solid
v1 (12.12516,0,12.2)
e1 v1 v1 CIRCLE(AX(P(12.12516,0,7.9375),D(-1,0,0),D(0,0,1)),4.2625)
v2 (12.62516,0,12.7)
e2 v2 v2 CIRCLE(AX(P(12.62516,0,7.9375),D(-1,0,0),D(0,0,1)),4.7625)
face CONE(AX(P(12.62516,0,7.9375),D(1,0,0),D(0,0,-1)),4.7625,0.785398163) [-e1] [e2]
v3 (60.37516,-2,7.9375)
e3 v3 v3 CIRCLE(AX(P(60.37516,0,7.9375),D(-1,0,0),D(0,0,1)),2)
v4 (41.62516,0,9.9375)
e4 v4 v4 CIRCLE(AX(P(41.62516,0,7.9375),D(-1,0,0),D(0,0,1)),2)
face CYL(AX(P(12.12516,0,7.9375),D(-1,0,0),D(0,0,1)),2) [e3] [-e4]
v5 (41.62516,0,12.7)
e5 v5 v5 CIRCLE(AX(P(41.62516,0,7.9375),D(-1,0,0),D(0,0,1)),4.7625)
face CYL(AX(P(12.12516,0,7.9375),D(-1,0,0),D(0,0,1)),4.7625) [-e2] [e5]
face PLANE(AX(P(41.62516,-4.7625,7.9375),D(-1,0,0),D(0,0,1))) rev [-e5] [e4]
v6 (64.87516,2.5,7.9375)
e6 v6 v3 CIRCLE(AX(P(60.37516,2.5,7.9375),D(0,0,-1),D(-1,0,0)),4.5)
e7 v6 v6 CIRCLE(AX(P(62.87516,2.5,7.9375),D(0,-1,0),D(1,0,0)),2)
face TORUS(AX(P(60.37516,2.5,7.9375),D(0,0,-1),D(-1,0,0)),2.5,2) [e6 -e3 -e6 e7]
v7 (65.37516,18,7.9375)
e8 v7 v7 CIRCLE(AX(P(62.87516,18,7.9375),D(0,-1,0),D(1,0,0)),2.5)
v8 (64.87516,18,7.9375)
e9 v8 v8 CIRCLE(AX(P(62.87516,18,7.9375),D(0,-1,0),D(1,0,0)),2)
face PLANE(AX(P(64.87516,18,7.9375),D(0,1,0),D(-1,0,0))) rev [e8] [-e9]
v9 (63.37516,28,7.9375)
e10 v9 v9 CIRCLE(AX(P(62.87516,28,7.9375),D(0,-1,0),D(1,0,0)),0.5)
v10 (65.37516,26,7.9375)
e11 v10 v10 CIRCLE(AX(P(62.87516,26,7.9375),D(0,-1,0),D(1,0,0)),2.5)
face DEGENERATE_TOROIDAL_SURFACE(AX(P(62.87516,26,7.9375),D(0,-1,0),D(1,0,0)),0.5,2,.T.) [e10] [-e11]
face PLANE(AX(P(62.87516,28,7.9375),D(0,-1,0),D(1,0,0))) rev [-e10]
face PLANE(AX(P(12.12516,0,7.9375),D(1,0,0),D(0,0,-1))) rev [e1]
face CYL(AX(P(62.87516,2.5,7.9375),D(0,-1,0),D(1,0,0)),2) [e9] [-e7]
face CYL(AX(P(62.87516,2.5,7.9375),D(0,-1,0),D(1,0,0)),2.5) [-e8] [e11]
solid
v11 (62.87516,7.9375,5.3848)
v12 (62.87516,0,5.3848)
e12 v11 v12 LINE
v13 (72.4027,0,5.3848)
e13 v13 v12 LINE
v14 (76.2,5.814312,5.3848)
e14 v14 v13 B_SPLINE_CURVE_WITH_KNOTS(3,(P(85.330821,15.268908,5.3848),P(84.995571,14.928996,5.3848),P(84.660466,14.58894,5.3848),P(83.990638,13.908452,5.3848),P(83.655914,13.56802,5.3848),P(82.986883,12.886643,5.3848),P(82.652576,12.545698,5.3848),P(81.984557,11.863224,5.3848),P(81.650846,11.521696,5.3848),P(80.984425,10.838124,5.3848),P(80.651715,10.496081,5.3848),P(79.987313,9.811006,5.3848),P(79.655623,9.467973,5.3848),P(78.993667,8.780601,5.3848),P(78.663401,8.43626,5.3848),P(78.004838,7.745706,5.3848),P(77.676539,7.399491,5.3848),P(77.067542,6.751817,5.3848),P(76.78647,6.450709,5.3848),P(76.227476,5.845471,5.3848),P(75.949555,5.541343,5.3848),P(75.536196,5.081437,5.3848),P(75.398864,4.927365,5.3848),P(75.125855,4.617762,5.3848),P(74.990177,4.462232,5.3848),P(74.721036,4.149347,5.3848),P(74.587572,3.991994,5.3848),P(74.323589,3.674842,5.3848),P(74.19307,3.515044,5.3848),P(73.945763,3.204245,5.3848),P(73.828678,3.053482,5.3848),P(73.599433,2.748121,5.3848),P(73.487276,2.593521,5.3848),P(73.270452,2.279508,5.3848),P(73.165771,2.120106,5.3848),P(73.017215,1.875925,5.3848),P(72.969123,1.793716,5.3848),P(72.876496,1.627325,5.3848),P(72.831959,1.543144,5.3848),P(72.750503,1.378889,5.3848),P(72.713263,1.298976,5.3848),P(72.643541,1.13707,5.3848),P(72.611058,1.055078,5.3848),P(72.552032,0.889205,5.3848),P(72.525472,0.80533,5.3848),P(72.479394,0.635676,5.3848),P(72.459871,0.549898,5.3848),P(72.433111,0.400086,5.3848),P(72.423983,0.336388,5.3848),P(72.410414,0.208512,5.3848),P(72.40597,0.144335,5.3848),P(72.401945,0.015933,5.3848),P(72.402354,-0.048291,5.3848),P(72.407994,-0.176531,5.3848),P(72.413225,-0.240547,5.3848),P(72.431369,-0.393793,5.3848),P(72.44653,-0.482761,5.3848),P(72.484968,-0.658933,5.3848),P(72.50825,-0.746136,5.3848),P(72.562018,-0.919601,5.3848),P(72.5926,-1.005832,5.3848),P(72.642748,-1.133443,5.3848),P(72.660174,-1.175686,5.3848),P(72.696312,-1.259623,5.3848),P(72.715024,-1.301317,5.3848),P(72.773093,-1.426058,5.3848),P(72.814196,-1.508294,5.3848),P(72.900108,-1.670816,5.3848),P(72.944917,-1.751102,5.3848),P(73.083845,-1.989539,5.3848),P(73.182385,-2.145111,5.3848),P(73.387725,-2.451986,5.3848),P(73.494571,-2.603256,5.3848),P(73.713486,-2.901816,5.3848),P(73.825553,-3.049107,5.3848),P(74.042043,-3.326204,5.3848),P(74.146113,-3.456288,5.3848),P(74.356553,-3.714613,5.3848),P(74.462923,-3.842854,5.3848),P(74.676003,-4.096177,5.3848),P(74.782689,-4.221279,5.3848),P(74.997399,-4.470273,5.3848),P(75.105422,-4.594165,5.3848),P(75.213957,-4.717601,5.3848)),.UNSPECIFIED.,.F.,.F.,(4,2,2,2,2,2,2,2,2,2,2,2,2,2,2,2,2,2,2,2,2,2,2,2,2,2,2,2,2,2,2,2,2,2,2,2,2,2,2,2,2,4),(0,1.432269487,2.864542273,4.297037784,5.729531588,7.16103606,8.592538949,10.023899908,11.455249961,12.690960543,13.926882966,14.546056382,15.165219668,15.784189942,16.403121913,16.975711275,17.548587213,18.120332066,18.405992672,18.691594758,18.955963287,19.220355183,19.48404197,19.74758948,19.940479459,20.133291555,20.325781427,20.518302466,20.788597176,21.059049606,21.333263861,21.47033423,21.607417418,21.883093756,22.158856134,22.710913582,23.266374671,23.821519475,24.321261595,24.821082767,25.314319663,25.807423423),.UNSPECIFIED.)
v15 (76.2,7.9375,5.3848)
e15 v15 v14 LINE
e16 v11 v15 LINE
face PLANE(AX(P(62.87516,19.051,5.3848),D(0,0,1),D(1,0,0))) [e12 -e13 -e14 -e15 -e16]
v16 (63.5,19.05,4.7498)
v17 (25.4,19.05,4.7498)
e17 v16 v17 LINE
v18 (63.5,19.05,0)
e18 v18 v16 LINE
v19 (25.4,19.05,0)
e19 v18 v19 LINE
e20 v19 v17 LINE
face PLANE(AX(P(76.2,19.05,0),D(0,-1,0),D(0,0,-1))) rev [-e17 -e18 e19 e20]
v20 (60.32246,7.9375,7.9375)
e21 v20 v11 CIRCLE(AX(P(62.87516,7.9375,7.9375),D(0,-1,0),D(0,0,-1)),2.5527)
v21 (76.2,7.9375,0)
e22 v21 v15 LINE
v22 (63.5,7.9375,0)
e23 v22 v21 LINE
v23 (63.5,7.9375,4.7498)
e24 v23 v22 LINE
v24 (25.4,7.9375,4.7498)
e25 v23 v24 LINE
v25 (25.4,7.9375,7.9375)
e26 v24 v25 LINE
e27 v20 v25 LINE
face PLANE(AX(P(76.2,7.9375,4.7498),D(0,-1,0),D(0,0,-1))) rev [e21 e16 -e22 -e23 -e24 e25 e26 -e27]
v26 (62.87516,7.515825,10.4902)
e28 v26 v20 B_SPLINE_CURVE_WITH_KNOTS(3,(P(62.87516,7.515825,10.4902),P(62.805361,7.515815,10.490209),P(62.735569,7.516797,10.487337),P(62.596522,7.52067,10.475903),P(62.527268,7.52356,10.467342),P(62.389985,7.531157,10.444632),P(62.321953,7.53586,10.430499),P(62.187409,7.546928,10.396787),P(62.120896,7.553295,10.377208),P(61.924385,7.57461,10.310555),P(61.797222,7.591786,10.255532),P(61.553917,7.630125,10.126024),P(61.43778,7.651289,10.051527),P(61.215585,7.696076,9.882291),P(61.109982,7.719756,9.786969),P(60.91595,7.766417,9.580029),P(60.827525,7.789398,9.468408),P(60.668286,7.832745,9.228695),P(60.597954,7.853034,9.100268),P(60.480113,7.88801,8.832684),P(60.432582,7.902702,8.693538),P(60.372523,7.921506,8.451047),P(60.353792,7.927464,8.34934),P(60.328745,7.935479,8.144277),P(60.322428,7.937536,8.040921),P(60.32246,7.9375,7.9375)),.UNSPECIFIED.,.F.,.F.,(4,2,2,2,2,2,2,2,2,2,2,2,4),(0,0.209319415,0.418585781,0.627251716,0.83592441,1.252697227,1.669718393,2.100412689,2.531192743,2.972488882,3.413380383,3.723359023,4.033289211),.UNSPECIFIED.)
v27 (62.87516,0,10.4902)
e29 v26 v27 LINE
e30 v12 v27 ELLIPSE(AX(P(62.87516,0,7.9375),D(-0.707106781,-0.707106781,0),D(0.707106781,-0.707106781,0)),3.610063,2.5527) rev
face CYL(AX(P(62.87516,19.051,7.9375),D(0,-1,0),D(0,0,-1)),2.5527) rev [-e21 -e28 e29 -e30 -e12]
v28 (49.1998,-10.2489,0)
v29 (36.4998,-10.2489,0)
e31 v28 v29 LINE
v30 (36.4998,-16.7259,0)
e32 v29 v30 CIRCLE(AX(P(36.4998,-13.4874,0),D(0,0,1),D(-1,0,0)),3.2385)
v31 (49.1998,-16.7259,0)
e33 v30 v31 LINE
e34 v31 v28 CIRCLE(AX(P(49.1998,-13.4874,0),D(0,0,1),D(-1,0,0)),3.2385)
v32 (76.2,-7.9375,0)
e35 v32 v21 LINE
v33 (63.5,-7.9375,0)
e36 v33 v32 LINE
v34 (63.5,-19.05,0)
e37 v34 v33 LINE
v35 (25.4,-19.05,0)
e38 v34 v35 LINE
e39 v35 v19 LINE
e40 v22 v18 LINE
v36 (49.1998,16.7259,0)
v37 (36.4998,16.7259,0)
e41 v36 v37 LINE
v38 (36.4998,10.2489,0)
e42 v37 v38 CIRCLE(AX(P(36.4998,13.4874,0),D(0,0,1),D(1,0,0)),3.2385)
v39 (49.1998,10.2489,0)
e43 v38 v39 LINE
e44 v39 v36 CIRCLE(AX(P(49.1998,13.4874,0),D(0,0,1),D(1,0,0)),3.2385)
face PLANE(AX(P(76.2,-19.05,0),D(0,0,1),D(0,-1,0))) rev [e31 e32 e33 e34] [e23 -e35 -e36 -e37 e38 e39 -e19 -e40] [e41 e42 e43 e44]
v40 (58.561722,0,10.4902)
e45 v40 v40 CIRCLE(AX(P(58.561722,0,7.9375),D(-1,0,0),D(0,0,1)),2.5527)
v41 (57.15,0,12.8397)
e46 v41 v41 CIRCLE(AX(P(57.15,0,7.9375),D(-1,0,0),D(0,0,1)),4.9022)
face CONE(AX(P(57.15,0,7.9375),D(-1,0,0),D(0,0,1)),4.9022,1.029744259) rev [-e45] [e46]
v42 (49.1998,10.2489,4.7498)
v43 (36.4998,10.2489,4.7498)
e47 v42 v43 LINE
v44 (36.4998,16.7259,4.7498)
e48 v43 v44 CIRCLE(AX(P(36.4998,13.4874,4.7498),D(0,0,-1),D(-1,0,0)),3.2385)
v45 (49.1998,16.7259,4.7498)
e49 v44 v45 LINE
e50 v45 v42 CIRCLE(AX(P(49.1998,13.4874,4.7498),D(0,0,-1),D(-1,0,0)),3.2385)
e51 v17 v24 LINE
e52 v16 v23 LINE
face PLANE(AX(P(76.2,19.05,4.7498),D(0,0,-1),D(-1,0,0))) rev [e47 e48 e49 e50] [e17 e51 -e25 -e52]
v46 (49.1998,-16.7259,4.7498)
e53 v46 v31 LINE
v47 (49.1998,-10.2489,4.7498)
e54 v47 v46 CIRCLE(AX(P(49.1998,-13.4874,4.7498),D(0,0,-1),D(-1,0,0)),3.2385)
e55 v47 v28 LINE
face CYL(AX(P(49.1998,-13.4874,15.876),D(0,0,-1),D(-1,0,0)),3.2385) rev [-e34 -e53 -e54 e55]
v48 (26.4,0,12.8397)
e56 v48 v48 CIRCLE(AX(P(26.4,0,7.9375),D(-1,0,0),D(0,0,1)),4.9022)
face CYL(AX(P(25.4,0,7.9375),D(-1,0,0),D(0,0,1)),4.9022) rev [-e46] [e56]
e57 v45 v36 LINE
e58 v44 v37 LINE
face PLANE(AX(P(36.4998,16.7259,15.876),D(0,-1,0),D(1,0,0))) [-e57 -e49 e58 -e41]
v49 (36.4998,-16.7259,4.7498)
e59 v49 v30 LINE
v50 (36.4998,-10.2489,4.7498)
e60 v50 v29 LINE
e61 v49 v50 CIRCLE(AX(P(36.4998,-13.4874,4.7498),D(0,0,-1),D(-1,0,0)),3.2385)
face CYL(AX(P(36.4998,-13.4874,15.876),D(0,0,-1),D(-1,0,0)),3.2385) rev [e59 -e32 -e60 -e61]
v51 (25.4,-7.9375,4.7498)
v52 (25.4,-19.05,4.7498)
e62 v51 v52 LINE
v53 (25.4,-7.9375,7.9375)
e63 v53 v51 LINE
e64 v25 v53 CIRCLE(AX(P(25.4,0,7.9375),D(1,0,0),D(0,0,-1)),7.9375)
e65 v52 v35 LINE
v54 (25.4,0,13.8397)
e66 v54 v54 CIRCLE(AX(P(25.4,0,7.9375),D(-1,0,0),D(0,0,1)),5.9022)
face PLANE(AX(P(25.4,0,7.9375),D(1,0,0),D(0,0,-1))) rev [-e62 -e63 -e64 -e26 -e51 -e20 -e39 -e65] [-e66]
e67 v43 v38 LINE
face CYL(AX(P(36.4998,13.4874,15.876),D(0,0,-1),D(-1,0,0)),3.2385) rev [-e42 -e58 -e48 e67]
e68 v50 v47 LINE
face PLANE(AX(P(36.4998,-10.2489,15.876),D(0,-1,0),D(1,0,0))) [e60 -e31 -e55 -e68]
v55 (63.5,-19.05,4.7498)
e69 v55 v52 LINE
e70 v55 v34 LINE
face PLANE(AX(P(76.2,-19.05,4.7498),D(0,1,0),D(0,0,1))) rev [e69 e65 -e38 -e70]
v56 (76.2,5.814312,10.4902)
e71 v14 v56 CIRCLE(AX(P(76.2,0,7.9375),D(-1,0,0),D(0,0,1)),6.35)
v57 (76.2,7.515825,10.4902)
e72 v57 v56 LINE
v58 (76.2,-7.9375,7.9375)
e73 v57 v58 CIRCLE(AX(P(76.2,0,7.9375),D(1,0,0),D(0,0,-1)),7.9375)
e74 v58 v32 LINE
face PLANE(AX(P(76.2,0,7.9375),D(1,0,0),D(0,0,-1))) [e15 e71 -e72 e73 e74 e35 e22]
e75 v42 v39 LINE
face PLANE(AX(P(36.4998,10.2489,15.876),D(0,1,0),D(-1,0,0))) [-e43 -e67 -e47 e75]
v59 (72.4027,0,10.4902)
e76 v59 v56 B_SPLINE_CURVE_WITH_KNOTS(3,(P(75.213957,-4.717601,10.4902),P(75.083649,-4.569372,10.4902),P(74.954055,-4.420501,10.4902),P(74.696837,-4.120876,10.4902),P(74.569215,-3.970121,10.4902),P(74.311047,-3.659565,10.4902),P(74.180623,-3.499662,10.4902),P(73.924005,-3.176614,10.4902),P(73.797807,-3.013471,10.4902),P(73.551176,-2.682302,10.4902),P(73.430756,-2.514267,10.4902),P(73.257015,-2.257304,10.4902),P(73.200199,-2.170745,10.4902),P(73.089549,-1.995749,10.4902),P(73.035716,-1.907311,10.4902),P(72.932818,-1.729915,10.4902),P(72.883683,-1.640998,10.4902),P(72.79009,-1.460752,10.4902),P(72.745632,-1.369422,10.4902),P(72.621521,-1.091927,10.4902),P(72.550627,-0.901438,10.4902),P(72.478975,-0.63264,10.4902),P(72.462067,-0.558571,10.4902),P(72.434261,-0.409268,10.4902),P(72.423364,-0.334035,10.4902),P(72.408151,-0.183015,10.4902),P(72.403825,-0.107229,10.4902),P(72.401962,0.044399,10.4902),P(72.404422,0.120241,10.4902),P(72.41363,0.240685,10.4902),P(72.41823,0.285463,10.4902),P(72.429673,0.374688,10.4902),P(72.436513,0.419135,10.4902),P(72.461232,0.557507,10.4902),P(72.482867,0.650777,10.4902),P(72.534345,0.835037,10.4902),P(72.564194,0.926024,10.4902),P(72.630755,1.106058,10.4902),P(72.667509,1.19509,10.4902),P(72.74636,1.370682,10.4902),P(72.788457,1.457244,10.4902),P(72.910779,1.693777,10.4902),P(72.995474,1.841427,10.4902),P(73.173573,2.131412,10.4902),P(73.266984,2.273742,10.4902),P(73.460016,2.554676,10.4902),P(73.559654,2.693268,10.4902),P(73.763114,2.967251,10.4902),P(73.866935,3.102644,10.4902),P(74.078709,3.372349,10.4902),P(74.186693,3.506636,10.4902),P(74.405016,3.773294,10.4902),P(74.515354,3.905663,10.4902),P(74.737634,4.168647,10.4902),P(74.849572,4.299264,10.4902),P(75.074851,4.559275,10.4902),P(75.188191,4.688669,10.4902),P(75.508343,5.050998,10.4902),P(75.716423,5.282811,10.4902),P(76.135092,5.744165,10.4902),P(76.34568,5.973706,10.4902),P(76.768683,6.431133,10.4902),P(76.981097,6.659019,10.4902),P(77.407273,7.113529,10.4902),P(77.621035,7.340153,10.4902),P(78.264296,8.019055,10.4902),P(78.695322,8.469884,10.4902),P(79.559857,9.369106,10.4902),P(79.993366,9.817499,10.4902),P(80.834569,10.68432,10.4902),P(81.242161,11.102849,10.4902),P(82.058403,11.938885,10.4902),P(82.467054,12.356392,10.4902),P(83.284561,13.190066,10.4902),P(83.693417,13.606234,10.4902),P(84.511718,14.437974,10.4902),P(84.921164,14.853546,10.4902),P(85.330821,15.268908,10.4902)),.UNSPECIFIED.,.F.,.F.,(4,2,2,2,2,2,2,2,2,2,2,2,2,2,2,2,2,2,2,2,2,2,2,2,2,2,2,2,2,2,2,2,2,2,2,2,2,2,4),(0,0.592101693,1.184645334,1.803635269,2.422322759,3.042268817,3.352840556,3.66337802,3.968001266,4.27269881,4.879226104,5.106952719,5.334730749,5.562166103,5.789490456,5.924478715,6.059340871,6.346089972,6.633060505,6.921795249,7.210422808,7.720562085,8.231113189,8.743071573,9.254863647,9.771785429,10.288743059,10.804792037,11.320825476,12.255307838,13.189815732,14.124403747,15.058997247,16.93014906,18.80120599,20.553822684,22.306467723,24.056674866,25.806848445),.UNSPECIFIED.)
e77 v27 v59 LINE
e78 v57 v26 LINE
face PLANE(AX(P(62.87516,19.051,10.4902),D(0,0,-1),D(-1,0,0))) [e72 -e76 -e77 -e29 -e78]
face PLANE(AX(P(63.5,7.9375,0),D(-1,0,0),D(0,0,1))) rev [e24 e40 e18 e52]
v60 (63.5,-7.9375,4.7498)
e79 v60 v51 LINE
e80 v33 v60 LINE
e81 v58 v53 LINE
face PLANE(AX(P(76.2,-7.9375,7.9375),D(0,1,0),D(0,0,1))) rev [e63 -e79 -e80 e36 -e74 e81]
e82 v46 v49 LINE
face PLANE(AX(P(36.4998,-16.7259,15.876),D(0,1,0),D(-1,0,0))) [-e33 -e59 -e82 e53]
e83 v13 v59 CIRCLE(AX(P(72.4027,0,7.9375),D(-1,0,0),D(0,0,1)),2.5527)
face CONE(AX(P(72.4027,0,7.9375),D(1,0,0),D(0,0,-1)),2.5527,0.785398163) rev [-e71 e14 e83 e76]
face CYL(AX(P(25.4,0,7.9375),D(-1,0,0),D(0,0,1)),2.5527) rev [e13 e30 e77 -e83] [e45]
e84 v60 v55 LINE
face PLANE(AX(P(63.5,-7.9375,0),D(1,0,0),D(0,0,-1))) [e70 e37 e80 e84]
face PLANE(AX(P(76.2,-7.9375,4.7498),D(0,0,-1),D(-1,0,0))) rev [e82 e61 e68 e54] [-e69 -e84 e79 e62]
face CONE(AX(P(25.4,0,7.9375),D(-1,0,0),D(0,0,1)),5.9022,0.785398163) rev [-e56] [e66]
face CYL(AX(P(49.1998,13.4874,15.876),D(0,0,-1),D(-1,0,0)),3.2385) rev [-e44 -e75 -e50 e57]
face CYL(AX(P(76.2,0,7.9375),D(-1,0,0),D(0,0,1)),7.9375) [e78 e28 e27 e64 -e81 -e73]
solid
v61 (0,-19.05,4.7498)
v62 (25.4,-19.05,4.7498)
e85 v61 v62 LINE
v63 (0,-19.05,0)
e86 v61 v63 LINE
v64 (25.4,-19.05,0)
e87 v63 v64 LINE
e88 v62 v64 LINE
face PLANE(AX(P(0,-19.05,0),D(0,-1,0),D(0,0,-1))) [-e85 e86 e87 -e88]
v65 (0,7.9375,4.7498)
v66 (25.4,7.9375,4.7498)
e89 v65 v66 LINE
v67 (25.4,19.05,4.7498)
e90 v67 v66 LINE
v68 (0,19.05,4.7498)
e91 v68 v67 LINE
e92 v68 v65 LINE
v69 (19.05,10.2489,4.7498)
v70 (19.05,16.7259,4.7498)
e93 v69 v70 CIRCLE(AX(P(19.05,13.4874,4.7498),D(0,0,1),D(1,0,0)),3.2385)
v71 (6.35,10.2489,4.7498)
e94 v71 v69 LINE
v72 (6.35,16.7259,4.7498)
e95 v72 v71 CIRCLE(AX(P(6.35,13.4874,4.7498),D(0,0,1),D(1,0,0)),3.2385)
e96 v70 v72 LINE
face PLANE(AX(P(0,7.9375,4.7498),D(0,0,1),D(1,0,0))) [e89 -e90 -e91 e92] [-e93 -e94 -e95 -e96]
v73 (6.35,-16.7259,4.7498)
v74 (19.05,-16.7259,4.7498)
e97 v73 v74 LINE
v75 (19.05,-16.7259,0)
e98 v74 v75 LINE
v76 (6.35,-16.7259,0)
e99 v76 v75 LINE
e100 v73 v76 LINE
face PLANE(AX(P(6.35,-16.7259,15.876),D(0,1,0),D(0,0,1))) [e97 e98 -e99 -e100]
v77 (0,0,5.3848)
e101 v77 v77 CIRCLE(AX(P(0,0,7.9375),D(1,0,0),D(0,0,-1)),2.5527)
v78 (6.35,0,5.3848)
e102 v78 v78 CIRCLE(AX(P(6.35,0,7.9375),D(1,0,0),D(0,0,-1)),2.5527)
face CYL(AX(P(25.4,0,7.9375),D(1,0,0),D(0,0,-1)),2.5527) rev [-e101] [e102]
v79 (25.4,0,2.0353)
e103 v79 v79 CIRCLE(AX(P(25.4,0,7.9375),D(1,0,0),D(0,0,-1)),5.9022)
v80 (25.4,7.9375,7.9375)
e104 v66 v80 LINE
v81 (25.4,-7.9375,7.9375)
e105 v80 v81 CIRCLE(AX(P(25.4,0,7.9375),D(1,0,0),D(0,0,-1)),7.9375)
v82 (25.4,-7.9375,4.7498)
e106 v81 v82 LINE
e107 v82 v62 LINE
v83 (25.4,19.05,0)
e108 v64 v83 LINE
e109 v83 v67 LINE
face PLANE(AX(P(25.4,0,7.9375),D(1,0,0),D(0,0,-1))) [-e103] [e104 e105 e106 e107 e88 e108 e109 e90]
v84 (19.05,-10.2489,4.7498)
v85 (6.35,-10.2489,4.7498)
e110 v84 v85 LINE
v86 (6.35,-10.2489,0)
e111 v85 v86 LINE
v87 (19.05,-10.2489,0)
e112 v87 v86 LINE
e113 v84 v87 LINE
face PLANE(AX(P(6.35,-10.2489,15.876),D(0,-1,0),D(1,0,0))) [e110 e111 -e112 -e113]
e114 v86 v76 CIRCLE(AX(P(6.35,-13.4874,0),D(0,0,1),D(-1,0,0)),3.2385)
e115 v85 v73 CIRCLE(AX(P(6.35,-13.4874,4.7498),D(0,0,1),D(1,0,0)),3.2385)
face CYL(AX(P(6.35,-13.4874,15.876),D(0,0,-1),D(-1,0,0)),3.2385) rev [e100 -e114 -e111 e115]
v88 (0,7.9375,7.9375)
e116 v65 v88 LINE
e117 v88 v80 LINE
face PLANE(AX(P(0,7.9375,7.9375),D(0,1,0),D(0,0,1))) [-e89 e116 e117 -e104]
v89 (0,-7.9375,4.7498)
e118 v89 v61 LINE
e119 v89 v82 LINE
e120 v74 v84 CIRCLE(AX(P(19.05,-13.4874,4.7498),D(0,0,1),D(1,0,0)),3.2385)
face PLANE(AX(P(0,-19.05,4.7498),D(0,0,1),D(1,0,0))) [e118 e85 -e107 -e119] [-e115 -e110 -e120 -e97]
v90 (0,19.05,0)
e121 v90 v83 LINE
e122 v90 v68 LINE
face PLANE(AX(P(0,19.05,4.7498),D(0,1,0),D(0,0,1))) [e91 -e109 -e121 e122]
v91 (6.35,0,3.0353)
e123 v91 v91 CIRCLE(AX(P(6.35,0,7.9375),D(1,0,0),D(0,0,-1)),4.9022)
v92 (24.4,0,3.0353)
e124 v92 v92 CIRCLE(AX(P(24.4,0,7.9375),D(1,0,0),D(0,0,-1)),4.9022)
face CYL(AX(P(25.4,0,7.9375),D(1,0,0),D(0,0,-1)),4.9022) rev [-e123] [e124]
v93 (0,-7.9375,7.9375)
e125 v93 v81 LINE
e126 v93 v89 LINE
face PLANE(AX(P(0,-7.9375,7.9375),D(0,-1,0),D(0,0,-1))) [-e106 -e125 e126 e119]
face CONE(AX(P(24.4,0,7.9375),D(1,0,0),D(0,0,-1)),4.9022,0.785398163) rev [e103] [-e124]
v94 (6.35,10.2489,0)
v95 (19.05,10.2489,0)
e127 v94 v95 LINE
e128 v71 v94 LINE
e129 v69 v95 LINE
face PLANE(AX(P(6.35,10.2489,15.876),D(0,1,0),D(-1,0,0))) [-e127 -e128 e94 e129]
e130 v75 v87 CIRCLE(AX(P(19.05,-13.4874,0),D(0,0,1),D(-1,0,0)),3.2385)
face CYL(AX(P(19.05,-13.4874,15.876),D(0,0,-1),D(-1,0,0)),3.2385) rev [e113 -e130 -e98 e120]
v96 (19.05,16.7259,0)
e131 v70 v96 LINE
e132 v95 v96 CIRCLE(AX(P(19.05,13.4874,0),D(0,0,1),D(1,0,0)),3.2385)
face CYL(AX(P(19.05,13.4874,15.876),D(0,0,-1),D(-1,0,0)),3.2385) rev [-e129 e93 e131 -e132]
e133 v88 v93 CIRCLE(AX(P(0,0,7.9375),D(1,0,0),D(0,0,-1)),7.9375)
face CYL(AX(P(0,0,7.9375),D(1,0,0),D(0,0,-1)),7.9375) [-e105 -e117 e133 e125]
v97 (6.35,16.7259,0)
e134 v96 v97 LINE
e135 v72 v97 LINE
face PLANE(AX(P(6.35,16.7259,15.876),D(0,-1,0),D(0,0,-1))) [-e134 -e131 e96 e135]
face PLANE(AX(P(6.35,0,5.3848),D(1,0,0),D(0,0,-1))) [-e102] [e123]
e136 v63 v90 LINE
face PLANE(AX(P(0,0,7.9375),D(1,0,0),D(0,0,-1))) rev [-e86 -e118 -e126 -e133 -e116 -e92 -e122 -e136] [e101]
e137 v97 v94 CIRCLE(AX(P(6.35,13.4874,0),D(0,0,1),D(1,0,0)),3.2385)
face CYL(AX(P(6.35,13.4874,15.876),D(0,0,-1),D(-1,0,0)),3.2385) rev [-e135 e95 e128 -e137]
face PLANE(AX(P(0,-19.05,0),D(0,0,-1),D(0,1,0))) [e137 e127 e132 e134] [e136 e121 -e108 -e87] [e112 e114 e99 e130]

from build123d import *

# Parameters (mm, degrees)
BOSS_EXTRUDE1_DEPTH = 25.4
CUT_EXTRUDE2_REACH  = 37.498
BOSS_EXTRUDE2_DEPTH = 50.8
SKETCH5_W           = 4.7498
SKETCH5_H           = 11.1125
CUT_EXTRUDE3_DEPTH  = 12.7
CUT_EXTRUDE4_DEPTH  = 7.9375
CUT_EXTRUDE5_DEPTH  = 4.7498
SKETCH12_R          = 2


with BuildPart() as part:
    # Sketch1 → Boss-Extrude1 (new body)
    with BuildSketch(Plane(origin=(0, 0, 0), x_dir=(0, 0, -1), z_dir=(1, 0, 0))):
        with BuildLine():
            Line((0, -19.05), (0, 19.05))
            Line((0, 19.05), (-4.7498, 19.05))
            Line((-4.7498, 19.05), (-4.7498, 7.9375))
            Line((-4.7498, 7.9375), (-7.9375, 7.9375))
            ThreePointArc((-7.9375, 7.9375), (-15.875, 0), (-7.9375, -7.9375))
            Line((-7.9375, -7.9375), (-4.7498, -7.9375))
            Line((-4.7498, -7.9375), (-4.7498, -19.05))
            Line((-4.7498, -19.05), (0, -19.05))
        make_face()
    extrude(amount=-BOSS_EXTRUDE1_DEPTH)

    # Sketch2 → Cut-Revolve1 (revolve, cut)
    with BuildSketch(Plane(origin=(0, 0, 0), x_dir=(1, 0, 0), z_dir=(0, 1, 0)), mode=Mode.PRIVATE) as cut_revolve1_sk:
        Polygon((-25.4, -7.9375), (-25.4, -10.4902), (-19.05, -10.4902), (-19.05, -12.8397), (-1, -12.8397), (0, -13.8397), (0, -7.9375), align=None)
    revolve(cut_revolve1_sk.sketch.rotate(Axis((0, 0, 7.9375), (-1, 0, 0)), 180), axis=Axis((0, 0, 7.9375), (-1, 0, 0)), mode=Mode.SUBTRACT)

    # Sketch3 → Cut-Extrude2 (cut, up to next)
    with BuildSketch(Plane.XY, mode=Mode.PRIVATE) as cut_extrude2_sk1:
        with BuildLine():
            Line((-19.05, 16.7259), (-6.35, 16.7259))
            ThreePointArc((-6.35, 16.7259), (-3.1115, 13.4874), (-6.35, 10.2489))
            Line((-6.35, 10.2489), (-19.05, 10.2489))
            ThreePointArc((-19.05, 10.2489), (-22.2885, 13.4874), (-19.05, 16.7259))
        make_face()
    cut_extrude2_tool1 = extrude(cut_extrude2_sk1.sketch, amount=CUT_EXTRUDE2_REACH, mode=Mode.PRIVATE) & part.part
    # Sketch3 → Cut-Extrude2 (cut, up to next)
    with BuildSketch(Plane.XY, mode=Mode.PRIVATE) as cut_extrude2_sk2:
        with BuildLine():
            Line((-19.05, -16.7259), (-6.35, -16.7259))
            ThreePointArc((-6.35, -16.7259), (-3.1115, -13.4874), (-6.35, -10.2489))
            Line((-6.35, -10.2489), (-19.05, -10.2489))
            ThreePointArc((-19.05, -10.2489), (-22.2885, -13.4874), (-19.05, -16.7259))
        make_face()
    cut_extrude2_tool2 = extrude(cut_extrude2_sk2.sketch, amount=CUT_EXTRUDE2_REACH, mode=Mode.PRIVATE) & part.part
    add(cut_extrude2_tool1.solids().sort_by_distance((-12.7, 13.4874, 0))[0], mode=Mode.SUBTRACT)
    add(cut_extrude2_tool2.solids().sort_by_distance((-12.7, -13.4874, 0))[0], mode=Mode.SUBTRACT)


with BuildPart() as body_2:
    # Sketch4 → Boss-Extrude2 (new body)
    with BuildSketch(Plane(origin=(25.4, 0, 0), x_dir=(0, 0, -1), z_dir=(1, 0, 0))):
        with BuildLine():
            Line((0, -19.05), (0, 19.05))
            Line((0, 19.05), (-4.7498, 19.05))
            Line((-4.7498, 19.05), (-4.7498, 7.9375))
            Line((-4.7498, 7.9375), (-7.9375, 7.9375))
            ThreePointArc((-7.9375, 7.9375), (-15.875, 0), (-7.9375, -7.9375))
            Line((-7.9375, -7.9375), (-4.7498, -7.9375))
            Line((-4.7498, -7.9375), (-4.7498, -19.05))
            Line((-4.7498, -19.05), (0, -19.05))
        make_face()
    extrude(amount=BOSS_EXTRUDE2_DEPTH)

    # Sketch5 → Cut-Extrude3 (cut)
    with BuildSketch(Plane(origin=(76.2, 0, 0), x_dir=(0, 0, -1), z_dir=(1, 0, 0))):
        with Locations((-2.3749, 13.49375)):
            Rectangle(SKETCH5_W, SKETCH5_H)
        with Locations((-2.3749, -13.49375)):
            Rectangle(SKETCH5_W, SKETCH5_H)
    extrude(amount=-CUT_EXTRUDE3_DEPTH, mode=Mode.SUBTRACT)

    # Sketch6 → Cut-Revolve2 (revolve, cut)
    with BuildSketch(Plane(origin=(0, 0, 0), x_dir=(1, 0, 0), z_dir=(0, 1, 0))):
        Polygon((25.4, -7.9375), (25.4, -13.8397), (26.4, -12.8397), (57.15, -12.8397), (58.561722024, -10.4902), (72.4027, -10.4902), (76.2, -14.2875), (76.2, -7.9375), align=None)
    revolve(axis=Axis((25.4, 0, 7.9375), (1, 0, 0)), mode=Mode.SUBTRACT)

    # Sketch7 → Cut-Extrude4 (cut)
    with BuildSketch(Plane(origin=(0, 0, 0), x_dir=(1, 0, 0), z_dir=(0, 1, 0))):
        with BuildLine():
            Line((62.87516, -10.4902), (76.2, -10.4902))
            Line((76.2, -10.4902), (76.2, -5.3848))
            Line((76.2, -5.3848), (62.87516, -5.3848))
            ThreePointArc((62.87516, -5.3848), (60.32246, -7.9375), (62.87516, -10.4902))
        make_face()
    extrude(amount=CUT_EXTRUDE4_DEPTH, mode=Mode.SUBTRACT)

    # Sketch8 → Cut-Extrude5 (cut)
    with BuildSketch(Plane.XY):
        with BuildLine():
            Line((36.4998, 16.7259), (49.1998, 16.7259))
            ThreePointArc((49.1998, 16.7259), (52.4383, 13.4874), (49.1998, 10.2489))
            Line((49.1998, 10.2489), (36.4998, 10.2489))
            ThreePointArc((36.4998, 10.2489), (33.2613, 13.4874), (36.4998, 16.7259))
        make_face()
        with BuildLine():
            Line((36.4998, -16.7259), (49.1998, -16.7259))
            ThreePointArc((49.1998, -16.7259), (52.4383, -13.4874), (49.1998, -10.2489))
            Line((49.1998, -10.2489), (36.4998, -10.2489))
            ThreePointArc((36.4998, -10.2489), (33.2613, -13.4874), (36.4998, -16.7259))
        make_face()
    extrude(amount=CUT_EXTRUDE5_DEPTH, mode=Mode.SUBTRACT)


with BuildPart() as body_3:
    # Sketch9 → Revolve1 (revolve)
    with BuildSketch(Plane.XY.offset(7.9375), mode=Mode.PRIVATE) as revolve1_sk:
        Polygon((12.12516, 0), (12.12516, 4.2625), (12.62516, 4.7625), (41.62516, 4.7625), (41.62516, 2), (60.37516, 2), (60.37516, 0), align=None)
    revolve(revolve1_sk.sketch.rotate(Axis((12.12516, 0, 7.9375), (1, 0, 0)), 90), axis=Axis((12.12516, 0, 7.9375), (1, 0, 0)))



with BuildPart() as body_4:
    # Sketch11 → Revolve2 (revolve)
    with BuildSketch(Plane.XY.offset(7.9375), mode=Mode.PRIVATE) as revolve2_sk:
        with BuildLine():
            Line((60.87516, 2.5), (60.87516, 18))
            Line((60.87516, 18), (60.37516, 18))
            Line((60.37516, 18), (60.37516, 26))
            ThreePointArc((60.37516, 26), (60.960946438, 27.414213562), (62.37516, 28))
            Line((62.37516, 28), (62.87516, 28))
            Line((62.87516, 28), (62.87516, 2.5))
            Line((62.87516, 2.5), (60.87516, 2.5))
        make_face()
    revolve(revolve2_sk.sketch.rotate(Axis((62.87516, 2.5, 7.9375), (0, 1, 0)), 180), axis=Axis((62.87516, 2.5, 7.9375), (0, 1, 0)))


with BuildPart() as body_3_1:
    add(body_3.part)

    add(body_4.part)  # Sweep1 merges body 4
    # Sweep1: sweep along a path in Sketch13
    with BuildLine(Plane.XY.offset(7.9375)) as sweep1_path:
        ThreePointArc((60.37516, 0), (62.142926953, 0.732233047), (62.87516, 2.5))
    # Sketch12 → Sweep1 (sweep)
    with BuildSketch(Plane(origin=(60.37516, 0, 0), x_dir=(0, 0, -1), z_dir=(1, 0, 0))):
        with Locations((-7.9375, 0)):
            Circle(SKETCH12_R)
    sweep(path=sweep1_path.line)


with BuildPart() as part_1:
    # Body-Move/Copy1: read off the stored shape, not the designer's step
    # Body-Move/Copy1: moved
    add(part.part.moved(Location((25.4, 0, 0))))


solid = Compound([body_2.part, body_3_1.part, part_1.part])
